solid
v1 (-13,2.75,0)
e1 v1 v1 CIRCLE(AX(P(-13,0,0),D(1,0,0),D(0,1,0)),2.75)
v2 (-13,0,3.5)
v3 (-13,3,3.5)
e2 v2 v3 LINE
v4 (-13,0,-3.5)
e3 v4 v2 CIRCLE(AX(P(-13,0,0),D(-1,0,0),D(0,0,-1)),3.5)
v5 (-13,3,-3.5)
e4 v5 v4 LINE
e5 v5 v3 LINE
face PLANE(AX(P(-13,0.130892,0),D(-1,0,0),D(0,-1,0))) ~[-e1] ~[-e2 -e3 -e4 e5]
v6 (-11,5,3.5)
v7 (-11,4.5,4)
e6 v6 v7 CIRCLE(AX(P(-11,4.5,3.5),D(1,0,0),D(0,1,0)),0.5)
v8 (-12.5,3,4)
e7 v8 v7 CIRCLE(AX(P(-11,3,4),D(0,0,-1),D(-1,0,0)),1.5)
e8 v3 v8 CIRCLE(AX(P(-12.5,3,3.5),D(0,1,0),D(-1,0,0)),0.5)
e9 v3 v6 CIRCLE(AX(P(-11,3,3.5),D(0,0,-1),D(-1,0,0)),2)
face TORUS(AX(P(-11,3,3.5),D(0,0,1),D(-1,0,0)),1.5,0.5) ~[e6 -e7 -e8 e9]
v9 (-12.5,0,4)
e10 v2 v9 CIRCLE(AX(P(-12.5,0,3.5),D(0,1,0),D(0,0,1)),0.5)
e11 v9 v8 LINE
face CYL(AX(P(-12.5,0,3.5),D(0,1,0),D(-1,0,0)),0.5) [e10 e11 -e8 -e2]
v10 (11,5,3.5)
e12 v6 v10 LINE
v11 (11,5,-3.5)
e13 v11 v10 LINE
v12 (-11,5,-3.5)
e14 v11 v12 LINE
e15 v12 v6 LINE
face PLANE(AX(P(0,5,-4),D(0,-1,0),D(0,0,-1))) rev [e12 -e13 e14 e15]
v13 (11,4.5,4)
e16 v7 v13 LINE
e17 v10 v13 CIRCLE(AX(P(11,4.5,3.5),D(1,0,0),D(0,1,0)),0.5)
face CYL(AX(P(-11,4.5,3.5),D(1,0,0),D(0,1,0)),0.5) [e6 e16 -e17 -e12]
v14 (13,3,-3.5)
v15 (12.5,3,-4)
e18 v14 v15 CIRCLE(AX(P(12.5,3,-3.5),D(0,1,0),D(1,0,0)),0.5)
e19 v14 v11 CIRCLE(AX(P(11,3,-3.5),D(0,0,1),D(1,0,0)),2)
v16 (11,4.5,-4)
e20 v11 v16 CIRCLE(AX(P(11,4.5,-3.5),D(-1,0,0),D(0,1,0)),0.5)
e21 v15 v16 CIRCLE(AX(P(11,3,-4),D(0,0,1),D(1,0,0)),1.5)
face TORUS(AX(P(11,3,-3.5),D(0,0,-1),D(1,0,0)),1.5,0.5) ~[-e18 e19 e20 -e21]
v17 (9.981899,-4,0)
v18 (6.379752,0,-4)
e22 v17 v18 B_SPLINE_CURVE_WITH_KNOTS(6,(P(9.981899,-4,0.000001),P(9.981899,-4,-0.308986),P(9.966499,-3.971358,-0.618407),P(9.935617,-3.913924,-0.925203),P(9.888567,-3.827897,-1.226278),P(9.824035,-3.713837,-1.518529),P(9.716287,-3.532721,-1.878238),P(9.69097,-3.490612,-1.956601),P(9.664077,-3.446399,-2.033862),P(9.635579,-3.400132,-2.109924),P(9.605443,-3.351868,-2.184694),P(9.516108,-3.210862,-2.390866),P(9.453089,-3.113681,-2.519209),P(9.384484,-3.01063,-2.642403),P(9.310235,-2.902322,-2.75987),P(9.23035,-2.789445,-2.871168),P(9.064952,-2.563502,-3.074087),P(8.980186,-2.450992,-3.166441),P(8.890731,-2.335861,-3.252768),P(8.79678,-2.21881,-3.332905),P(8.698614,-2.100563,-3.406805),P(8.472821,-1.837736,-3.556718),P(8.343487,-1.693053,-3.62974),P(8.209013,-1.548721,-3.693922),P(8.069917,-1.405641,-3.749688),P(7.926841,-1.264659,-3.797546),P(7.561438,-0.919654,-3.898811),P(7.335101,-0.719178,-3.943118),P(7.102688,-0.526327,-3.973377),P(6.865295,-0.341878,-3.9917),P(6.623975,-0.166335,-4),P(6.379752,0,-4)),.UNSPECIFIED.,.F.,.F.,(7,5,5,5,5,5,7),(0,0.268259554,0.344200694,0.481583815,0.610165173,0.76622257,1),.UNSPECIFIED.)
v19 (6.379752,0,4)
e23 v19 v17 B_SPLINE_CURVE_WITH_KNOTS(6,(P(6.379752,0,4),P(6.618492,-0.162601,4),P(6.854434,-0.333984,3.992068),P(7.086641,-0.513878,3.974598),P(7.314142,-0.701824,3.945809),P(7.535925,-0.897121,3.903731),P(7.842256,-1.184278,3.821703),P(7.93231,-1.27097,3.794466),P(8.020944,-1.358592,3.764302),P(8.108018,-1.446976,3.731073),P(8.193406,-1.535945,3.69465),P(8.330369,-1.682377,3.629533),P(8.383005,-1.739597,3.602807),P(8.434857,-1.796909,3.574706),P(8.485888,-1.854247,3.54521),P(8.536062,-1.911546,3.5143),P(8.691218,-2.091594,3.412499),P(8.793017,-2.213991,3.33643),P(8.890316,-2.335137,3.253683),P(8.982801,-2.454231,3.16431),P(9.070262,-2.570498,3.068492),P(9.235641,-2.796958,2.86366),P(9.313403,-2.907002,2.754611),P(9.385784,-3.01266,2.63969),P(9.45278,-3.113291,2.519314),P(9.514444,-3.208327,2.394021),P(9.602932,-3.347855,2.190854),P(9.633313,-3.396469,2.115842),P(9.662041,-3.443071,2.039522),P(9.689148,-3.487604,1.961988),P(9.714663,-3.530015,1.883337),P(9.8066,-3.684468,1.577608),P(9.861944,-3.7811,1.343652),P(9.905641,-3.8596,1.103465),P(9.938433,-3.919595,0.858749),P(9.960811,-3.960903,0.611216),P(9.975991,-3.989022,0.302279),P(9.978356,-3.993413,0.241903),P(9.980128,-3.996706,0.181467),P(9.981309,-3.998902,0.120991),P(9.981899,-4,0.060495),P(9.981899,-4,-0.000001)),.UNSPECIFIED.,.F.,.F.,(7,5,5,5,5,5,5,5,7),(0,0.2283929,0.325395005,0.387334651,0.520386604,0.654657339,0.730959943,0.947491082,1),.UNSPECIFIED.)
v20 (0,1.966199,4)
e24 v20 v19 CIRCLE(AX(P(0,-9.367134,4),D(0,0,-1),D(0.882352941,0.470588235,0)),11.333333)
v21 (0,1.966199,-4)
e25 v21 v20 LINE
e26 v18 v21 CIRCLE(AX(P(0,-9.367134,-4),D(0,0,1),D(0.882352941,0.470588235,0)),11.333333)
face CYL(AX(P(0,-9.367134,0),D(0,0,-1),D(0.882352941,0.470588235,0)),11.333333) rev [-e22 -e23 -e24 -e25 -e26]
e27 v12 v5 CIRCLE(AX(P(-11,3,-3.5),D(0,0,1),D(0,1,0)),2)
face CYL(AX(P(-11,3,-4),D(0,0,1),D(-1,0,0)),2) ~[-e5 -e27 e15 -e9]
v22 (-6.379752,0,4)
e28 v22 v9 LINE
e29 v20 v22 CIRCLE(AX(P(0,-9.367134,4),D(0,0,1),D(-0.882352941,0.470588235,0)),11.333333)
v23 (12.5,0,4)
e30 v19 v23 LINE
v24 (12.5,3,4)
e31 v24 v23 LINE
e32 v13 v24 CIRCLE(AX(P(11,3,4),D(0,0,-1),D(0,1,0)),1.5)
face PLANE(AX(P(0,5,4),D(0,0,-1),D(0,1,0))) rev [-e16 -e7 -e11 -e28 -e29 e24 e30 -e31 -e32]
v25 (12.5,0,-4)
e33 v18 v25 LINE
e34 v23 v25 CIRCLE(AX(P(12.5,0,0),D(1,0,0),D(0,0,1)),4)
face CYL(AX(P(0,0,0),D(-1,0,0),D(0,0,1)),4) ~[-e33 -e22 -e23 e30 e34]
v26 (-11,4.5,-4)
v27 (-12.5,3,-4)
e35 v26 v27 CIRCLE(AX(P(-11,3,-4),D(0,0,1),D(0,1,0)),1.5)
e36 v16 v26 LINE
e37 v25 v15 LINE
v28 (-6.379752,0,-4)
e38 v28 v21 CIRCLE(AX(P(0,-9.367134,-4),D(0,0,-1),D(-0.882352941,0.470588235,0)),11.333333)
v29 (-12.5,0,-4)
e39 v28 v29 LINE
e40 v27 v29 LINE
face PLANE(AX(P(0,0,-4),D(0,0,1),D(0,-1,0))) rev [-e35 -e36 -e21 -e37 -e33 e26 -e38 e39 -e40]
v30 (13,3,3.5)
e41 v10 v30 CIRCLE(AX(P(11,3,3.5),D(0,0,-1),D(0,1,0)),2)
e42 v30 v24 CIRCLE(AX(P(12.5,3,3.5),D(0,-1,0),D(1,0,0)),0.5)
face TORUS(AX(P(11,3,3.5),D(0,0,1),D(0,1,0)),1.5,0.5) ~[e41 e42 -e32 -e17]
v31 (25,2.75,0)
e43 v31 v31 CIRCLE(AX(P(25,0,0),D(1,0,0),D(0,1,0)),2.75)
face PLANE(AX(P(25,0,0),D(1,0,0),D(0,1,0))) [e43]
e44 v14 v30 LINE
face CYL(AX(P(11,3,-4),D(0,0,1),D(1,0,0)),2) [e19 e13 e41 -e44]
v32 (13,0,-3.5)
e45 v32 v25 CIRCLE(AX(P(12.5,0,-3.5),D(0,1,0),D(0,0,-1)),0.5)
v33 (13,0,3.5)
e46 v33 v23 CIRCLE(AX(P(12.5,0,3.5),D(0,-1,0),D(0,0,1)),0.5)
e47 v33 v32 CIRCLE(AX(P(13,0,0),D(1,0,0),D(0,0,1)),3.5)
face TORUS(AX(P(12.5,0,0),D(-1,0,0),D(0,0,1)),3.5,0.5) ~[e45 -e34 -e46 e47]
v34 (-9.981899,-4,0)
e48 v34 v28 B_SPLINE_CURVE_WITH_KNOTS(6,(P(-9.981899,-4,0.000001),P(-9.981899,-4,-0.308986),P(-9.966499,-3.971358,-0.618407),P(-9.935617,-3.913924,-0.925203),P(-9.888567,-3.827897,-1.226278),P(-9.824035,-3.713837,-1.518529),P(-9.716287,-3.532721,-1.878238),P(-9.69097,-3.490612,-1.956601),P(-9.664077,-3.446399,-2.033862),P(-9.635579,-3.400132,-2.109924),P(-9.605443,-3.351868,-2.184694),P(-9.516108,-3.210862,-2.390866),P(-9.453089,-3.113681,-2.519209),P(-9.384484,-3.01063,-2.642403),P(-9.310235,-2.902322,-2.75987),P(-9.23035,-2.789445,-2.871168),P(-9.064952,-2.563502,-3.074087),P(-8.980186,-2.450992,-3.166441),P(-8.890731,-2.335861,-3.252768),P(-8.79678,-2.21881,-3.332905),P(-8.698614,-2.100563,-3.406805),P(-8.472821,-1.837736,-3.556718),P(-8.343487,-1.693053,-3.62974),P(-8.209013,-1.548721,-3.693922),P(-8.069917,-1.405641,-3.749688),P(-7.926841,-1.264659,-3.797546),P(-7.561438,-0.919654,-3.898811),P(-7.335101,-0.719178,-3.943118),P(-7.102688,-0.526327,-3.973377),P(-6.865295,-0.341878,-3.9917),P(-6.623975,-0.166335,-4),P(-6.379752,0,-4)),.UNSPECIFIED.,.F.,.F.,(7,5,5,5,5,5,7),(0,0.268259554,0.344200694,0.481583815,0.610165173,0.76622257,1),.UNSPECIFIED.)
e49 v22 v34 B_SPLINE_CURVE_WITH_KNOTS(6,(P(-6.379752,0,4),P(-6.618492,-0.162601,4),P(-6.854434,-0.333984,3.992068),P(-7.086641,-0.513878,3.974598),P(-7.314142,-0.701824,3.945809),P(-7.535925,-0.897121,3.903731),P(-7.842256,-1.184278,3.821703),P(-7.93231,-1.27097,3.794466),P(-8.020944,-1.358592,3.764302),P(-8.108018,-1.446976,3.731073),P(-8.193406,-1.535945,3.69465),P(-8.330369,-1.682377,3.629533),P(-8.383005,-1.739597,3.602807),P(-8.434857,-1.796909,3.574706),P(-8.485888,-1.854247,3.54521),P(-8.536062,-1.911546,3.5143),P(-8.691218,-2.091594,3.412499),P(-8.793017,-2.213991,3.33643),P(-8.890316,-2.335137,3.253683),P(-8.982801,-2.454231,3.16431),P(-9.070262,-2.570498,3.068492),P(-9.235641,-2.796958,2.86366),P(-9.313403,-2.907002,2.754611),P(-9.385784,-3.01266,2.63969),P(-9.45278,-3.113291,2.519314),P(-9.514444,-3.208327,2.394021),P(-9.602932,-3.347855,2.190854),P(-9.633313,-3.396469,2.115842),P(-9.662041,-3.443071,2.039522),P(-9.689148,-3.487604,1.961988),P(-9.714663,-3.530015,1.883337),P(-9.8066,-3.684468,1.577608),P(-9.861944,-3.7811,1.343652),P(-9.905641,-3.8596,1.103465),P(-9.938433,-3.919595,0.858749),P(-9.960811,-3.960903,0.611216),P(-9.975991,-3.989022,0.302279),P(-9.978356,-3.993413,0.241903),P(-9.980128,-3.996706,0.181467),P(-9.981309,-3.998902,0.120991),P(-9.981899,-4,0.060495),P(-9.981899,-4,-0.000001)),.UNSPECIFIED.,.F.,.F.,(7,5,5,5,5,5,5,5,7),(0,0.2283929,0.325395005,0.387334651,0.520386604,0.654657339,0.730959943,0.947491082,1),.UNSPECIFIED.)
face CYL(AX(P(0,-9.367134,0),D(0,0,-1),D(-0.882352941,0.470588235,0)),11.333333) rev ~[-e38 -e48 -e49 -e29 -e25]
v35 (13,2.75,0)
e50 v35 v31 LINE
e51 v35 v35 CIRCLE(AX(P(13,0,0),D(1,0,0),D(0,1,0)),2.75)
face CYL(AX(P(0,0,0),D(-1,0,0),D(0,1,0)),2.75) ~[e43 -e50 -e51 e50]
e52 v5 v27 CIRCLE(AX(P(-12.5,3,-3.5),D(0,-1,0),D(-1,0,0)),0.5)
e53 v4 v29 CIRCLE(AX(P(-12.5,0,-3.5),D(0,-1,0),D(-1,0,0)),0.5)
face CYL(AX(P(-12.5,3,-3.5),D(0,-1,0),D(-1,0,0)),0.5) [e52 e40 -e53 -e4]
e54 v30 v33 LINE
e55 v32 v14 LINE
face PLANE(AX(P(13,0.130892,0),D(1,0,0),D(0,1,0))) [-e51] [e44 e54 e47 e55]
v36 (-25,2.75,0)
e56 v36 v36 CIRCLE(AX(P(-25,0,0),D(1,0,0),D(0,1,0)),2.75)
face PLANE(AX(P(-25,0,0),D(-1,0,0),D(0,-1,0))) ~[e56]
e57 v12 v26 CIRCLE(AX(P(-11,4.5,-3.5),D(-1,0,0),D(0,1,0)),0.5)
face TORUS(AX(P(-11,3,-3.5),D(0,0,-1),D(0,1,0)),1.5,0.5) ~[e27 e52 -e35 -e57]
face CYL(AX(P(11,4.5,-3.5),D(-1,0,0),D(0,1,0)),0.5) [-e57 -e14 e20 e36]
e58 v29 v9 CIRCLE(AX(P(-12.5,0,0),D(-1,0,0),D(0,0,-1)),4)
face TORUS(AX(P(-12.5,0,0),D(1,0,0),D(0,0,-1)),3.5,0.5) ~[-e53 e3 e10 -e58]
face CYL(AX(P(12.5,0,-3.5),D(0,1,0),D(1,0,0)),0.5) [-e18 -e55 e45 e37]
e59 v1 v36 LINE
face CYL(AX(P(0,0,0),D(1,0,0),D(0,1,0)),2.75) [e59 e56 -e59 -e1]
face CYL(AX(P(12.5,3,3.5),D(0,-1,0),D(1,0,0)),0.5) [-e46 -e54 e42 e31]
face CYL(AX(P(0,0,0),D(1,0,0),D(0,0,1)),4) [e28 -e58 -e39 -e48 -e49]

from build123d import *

# Parameters (mm, degrees)
F0_R          = 2.75
F1_DEPTH      = 25
F2_DEPTH      = 13
F3_R          = 2
F5_DEPTH      = 25
F5_DEPTH_BACK = 25
F7_R          = 0.5


with BuildPart() as f1:
    # F0 (on Right) → F1 (new body)
    with BuildSketch(Plane.YZ):
        Circle(F0_R)
    extrude(amount=F1_DEPTH)

    # F0 (on Right) → F2 (join)
    with BuildSketch(Plane.YZ):
        with BuildLine():
            ThreePointArc((0, -4), (2.8284271247, -2.8284271247), (4, 0))
            ThreePointArc((4, 0), (2.8284271247, 2.8284271247), (0, 4))
            ThreePointArc((0, 4), (-4, 0), (0, -4))
        make_face()
        Circle(F0_R, mode=Mode.SUBTRACT)
        with BuildLine():
            ThreePointArc((0, 4), (2.8284271247, 2.8284271247), (4, 0))
            ThreePointArc((4, 0), (2.8284271247, -2.8284271247), (0, -4))
            Line((0, -4), (5, -4))
            Line((5, -4), (5, 4))
            Line((5, 4), (0, 4))
        make_face()
    extrude(amount=F2_DEPTH)

    # F3
    f3_edges = [f1.edges().sort_by_distance(p)[0] for p in [
        (13, 5, 0),
    ]]
    fillet(f3_edges, radius=F3_R)

    # F4 (on Top) → F5 (cut, two sides)
    with BuildSketch(Plane.XY) as f5_sk:
        with BuildLine():
            Line((0, 1.9661990377), (0, -4.0338009623))
            Line((0, -4.0338009623), (10, -4.0338009623))
            ThreePointArc((10, -4.0338009623), (5.8309518948, 0.3511188625), (0, 1.9661990377))
        make_face()
    extrude(amount=F5_DEPTH, mode=Mode.SUBTRACT)
    extrude(f5_sk.sketch, amount=-F5_DEPTH_BACK, mode=Mode.SUBTRACT)

    # F6: F1 across face


with BuildPart() as f1_1:
    add(f1.part)
    add(f1.part.mirror(Plane(origin=(0, 3.4830995189, 0), x_dir=(0, -1, 0), z_dir=(-1, 0, 0))))

    # F7
    f7_edges = [f1_1.edges().sort_by_distance(p)[0] for p in [
        (13, -4, 0),
        (-13, -4, 0),
        (13, 1.5, -4),
        (13, 1.5, 4),
        (0, 5, 4),
        (12.414214, 4.414214, 4),
        (-13, 1.5, 4),
        (-12.414214, 4.414214, 4),
        (-12.414214, 4.414214, -4),
        (-13, 1.5, -4),
        (0, 5, -4),
        (12.414214, 4.414214, -4),
    ]]
    fillet(f7_edges, radius=F7_R)


solid = f1_1.part
